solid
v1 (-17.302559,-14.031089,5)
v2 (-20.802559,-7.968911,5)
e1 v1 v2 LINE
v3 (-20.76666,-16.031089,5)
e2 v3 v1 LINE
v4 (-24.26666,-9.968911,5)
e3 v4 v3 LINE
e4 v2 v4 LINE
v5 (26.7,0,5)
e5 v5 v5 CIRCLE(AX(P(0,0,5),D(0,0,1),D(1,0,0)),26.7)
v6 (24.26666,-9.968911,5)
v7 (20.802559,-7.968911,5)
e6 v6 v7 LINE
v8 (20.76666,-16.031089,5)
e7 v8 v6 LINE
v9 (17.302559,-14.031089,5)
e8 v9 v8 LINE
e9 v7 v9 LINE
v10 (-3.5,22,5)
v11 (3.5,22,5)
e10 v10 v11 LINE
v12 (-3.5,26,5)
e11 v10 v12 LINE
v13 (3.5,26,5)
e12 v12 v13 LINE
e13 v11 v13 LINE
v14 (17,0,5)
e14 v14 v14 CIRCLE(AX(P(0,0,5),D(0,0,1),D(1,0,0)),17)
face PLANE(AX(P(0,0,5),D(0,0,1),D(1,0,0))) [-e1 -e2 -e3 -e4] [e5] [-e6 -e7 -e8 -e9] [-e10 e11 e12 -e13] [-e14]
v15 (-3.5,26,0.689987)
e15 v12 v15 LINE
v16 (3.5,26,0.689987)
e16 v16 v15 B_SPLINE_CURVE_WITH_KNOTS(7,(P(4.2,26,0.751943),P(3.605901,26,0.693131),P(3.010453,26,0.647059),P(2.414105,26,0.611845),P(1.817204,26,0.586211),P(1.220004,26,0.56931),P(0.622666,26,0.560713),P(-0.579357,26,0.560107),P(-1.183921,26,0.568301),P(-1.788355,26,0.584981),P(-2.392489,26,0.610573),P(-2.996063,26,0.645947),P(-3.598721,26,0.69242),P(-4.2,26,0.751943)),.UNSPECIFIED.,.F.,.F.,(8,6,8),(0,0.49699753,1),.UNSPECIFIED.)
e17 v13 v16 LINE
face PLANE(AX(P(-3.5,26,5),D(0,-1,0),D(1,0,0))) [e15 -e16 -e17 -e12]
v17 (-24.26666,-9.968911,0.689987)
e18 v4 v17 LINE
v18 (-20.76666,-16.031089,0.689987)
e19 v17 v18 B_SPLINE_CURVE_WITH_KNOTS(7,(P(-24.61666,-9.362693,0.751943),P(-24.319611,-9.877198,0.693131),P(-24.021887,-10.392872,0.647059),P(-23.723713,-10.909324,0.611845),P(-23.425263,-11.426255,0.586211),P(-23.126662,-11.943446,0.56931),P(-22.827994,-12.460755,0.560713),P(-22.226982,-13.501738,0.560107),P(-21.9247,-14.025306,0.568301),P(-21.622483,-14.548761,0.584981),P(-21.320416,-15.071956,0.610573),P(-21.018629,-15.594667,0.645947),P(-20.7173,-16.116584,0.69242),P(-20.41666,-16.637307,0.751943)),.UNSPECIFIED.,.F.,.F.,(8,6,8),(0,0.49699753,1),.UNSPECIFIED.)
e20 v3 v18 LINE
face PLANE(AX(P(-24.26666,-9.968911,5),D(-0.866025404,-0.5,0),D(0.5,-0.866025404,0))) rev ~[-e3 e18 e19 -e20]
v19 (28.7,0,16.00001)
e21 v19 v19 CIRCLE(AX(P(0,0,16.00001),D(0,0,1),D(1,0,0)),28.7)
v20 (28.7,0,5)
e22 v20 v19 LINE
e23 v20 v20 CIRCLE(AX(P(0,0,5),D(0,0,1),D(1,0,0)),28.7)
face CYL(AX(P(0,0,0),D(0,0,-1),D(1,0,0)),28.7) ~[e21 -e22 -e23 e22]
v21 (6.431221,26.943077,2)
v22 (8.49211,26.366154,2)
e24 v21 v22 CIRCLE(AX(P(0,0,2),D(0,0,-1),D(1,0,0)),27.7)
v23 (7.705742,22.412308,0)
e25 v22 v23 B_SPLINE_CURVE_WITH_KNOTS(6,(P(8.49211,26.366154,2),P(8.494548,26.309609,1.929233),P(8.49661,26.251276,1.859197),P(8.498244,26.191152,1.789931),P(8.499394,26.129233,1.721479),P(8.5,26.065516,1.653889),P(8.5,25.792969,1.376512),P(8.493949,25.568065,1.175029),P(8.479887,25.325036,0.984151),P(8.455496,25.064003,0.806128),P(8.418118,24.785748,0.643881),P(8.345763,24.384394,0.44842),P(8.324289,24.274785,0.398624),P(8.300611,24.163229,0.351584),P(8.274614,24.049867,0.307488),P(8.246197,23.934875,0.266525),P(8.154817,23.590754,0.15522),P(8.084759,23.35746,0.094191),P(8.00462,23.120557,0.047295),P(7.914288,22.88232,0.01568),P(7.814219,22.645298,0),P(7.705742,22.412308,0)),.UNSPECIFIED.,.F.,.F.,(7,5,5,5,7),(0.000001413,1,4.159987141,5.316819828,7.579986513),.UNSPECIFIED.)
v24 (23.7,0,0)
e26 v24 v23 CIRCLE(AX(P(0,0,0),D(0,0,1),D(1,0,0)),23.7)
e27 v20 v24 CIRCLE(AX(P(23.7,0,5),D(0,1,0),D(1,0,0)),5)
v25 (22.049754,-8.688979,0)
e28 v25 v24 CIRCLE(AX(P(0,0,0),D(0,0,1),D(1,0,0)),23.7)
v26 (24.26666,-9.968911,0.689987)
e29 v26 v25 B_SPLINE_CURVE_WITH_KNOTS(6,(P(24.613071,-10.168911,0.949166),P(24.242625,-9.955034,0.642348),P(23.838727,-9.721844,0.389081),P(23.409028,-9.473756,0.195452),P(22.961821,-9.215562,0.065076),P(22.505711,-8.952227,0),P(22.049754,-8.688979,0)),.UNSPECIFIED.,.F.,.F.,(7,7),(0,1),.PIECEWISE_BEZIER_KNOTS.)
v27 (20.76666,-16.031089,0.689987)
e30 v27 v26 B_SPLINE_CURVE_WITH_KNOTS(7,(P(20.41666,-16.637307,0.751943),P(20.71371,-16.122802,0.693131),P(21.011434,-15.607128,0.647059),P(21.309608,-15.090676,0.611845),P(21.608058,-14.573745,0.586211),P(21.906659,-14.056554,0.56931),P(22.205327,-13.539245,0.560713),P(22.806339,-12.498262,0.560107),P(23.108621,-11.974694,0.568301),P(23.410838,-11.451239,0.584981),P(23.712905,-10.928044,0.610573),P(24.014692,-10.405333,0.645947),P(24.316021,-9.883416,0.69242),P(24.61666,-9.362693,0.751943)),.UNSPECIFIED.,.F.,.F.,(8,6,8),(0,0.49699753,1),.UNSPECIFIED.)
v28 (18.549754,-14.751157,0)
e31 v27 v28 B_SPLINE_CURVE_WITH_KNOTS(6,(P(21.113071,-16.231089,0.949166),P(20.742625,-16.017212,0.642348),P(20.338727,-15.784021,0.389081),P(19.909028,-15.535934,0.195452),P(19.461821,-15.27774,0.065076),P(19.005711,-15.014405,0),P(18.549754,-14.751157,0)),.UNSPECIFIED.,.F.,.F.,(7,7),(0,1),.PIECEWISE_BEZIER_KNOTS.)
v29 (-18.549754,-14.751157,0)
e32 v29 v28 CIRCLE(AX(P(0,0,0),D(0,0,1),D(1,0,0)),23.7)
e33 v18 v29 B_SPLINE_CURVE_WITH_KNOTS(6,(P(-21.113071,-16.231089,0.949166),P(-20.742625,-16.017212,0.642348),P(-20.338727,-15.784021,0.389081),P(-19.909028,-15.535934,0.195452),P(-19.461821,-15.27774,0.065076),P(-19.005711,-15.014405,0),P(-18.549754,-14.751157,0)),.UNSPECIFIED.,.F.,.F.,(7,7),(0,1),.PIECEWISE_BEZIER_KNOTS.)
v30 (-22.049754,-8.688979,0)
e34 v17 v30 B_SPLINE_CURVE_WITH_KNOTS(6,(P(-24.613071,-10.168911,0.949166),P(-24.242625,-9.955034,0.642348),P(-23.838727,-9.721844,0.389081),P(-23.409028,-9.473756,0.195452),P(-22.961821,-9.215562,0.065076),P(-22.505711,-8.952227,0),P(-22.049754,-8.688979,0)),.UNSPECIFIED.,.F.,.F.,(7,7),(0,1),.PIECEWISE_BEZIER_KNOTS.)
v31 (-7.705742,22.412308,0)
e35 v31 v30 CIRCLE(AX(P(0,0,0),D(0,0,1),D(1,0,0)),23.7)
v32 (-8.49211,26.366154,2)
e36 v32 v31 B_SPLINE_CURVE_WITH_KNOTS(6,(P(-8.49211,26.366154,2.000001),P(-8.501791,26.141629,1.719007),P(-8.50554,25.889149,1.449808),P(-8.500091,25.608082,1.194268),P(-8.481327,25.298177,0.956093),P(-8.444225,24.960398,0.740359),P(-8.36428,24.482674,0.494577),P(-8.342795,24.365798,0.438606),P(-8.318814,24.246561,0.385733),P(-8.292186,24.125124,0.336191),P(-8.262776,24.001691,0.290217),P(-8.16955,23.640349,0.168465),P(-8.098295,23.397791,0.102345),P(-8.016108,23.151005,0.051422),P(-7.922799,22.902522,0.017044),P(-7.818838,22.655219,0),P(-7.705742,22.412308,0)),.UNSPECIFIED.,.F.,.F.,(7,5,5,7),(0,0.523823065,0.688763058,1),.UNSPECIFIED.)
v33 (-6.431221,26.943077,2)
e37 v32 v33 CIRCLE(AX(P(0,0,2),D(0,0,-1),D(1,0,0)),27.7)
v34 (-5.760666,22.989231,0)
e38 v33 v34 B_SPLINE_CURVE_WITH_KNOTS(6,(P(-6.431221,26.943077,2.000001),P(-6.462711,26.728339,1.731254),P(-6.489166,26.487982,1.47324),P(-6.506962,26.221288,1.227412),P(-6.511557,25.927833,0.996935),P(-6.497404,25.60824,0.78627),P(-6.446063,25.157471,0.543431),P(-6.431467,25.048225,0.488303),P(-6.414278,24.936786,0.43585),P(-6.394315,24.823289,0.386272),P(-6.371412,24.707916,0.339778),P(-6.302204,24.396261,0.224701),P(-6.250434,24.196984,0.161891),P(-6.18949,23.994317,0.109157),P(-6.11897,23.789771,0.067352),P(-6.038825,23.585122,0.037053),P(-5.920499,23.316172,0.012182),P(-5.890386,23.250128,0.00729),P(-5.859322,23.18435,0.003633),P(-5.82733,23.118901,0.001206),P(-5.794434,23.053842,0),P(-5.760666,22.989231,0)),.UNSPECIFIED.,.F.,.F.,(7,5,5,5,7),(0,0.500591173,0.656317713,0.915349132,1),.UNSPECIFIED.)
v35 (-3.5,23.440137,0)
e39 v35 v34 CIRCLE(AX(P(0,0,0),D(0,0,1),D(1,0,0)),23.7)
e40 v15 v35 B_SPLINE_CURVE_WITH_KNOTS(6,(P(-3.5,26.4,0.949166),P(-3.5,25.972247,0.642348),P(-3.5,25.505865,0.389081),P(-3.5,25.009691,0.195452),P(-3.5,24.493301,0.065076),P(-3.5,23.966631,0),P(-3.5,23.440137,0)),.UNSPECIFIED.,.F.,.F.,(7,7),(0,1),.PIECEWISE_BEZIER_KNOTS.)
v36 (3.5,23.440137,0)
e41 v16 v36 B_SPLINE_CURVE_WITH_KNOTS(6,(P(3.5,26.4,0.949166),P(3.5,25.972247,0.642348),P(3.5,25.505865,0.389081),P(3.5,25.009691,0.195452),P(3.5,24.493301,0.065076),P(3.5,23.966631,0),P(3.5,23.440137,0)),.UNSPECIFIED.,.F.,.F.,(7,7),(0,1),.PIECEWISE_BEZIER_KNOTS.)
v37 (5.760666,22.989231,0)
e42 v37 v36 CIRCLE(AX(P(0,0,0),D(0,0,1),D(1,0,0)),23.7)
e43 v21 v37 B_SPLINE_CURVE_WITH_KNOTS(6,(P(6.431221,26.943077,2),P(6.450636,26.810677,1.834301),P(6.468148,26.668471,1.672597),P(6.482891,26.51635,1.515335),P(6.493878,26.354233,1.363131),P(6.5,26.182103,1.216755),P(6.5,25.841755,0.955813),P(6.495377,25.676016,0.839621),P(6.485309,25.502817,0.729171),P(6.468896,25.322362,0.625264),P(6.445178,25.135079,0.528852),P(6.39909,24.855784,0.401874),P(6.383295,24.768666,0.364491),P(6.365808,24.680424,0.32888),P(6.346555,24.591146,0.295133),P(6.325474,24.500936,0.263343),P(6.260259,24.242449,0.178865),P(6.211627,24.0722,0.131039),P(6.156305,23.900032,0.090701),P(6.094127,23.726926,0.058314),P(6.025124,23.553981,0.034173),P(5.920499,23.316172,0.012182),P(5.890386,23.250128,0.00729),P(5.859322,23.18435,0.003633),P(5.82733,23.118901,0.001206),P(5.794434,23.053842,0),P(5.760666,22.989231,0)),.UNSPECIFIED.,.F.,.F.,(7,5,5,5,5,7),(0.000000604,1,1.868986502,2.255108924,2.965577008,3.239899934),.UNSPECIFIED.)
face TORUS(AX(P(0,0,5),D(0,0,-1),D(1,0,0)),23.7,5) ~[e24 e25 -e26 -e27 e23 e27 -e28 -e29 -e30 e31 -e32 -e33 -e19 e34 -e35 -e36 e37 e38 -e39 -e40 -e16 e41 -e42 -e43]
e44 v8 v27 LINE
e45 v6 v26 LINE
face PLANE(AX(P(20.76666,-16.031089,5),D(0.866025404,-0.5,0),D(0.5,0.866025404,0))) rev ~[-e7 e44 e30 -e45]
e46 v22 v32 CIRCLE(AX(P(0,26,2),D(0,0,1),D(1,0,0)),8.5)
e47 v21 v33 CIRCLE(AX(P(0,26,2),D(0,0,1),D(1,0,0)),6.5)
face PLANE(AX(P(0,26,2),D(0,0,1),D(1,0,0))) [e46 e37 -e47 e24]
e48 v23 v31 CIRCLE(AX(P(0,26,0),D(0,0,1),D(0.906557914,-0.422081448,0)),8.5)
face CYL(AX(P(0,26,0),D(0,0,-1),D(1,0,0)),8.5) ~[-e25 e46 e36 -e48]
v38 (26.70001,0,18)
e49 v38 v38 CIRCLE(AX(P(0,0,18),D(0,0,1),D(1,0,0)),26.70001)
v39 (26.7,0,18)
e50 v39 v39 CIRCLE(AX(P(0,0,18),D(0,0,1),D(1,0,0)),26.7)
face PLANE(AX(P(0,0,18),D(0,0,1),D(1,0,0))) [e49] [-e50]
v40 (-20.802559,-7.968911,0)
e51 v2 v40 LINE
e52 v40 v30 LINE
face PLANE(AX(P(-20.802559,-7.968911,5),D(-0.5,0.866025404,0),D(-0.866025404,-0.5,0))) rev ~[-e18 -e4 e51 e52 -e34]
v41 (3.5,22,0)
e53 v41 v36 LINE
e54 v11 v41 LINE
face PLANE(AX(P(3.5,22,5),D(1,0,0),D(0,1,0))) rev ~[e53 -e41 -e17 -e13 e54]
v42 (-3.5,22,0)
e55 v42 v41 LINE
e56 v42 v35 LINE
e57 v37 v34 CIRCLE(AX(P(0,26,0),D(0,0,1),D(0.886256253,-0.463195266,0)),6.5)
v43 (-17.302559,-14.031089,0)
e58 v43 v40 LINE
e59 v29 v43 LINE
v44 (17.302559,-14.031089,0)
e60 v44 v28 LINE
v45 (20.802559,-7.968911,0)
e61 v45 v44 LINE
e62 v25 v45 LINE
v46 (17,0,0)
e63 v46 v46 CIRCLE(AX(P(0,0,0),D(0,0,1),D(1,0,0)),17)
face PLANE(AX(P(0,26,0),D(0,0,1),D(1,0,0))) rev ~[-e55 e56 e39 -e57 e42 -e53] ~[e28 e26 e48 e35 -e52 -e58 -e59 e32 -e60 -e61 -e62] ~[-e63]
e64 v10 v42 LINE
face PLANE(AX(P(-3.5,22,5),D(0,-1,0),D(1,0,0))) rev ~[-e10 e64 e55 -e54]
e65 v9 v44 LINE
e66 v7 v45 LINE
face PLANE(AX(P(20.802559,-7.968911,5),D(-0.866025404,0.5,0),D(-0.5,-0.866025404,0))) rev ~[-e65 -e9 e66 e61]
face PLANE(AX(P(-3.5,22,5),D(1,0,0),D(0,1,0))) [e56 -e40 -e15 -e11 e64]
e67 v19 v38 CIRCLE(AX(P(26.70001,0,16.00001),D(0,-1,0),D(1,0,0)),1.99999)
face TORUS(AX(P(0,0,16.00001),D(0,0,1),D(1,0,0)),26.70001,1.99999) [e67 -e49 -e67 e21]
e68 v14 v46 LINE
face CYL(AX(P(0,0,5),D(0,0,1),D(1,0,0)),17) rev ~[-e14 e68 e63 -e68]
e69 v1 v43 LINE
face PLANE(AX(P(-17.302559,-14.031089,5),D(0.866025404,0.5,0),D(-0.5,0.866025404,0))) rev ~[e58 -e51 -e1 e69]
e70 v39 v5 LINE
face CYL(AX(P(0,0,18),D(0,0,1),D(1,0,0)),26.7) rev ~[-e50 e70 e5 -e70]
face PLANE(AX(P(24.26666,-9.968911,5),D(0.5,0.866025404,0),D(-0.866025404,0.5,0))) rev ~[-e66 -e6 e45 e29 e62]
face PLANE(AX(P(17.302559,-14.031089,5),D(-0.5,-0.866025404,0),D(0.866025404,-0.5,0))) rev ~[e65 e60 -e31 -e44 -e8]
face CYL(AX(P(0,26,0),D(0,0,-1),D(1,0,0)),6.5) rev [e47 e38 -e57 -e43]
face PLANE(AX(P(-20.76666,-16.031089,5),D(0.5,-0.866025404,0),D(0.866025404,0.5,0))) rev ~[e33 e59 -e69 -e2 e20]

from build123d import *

# Parameters (mm, degrees)
F0_R     = 28.7
F0_R_2   = 26.7
F1_DEPTH = 18
F2_R     = 26.7
F3_DEPTH = 13
F4_R     = 17
F4_W     = 7
F4_H     = 4
F5_DEPTH = 5.001
F7_R     = 1.99999
F8_R     = 8.5
F8_R_2   = 6.5
F9_DEPTH = 2


# Not quite as in the source:
# - a fillet or chamfer that OpenCascade refuses, or shapes differently, is made with other operations: its cross-section is extruded or revolved along the edge and cut away or added
# - a fillet or chamfer is up to 0.001 mm smaller than in the source, because OpenCascade refuses the exact size


with BuildPart() as f1:
    # F0 (on Top) → F1 (new body)
    with BuildSketch(Plane.XY):
        Circle(F0_R)
        Circle(F0_R_2, mode=Mode.SUBTRACT)
        Circle(F0_R_2)
    extrude(amount=F1_DEPTH)

    # F2 (on face) → F3 (cut)
    with BuildSketch(Plane.XY.offset(18)):
        Circle(F2_R)
    extrude(amount=-F3_DEPTH, mode=Mode.SUBTRACT)

    # F4 (on face) → F5 (cut, through all)
    with BuildSketch(Plane.XY.offset(5)):
        Circle(F4_R)
        with Locations((0, 24)):
            Rectangle(F4_W, F4_H)
        Polygon((-20.8025588833, -7.9689110868), (-24.2666604984, -9.9689110868), (-20.7666604984, -16.0310889132), (-17.3025588833, -14.0310889132), align=None)
        Polygon((17.3025588833, -14.0310889132), (20.7666604984, -16.0310889132), (24.2666604984, -9.9689110868), (20.8025588833, -7.9689110868), align=None)
    extrude(amount=-F5_DEPTH, mode=Mode.SUBTRACT)

    # F6: fillet of radius 5 on 1 edges, made by hand

    # F6_s1 → F6_t2 (revolve, cut)
    with BuildSketch(Plane.XZ):
        with BuildLine():
            ThreePointArc((28.7, 5), (27.2355339059, 1.4644660941), (23.7, 0))
            Line((23.7, 0), (28.7, 0))
            Line((28.7, 0), (28.7, 5))
        make_face()
    revolve(axis=Axis((0, 0, 0), (0, 0, 1)), mode=Mode.SUBTRACT)

    # F7 (radius 2 in the source; OpenCascade refuses exactly that, so slightly less here)
    f7_edges = [f1.edges().sort_by_distance(p)[0] for p in [
        (-28.7, 0, 18),
    ]]
    fillet(f7_edges, radius=F7_R)

    # F8 (on Top) → F9 (join)
    with BuildSketch(Plane.XY):
        with Locations((0, 26)):
            Circle(F8_R)
        with Locations((0, 26)):
            Circle(F8_R_2, mode=Mode.SUBTRACT)
    extrude(amount=F9_DEPTH)


solid = f1.part
